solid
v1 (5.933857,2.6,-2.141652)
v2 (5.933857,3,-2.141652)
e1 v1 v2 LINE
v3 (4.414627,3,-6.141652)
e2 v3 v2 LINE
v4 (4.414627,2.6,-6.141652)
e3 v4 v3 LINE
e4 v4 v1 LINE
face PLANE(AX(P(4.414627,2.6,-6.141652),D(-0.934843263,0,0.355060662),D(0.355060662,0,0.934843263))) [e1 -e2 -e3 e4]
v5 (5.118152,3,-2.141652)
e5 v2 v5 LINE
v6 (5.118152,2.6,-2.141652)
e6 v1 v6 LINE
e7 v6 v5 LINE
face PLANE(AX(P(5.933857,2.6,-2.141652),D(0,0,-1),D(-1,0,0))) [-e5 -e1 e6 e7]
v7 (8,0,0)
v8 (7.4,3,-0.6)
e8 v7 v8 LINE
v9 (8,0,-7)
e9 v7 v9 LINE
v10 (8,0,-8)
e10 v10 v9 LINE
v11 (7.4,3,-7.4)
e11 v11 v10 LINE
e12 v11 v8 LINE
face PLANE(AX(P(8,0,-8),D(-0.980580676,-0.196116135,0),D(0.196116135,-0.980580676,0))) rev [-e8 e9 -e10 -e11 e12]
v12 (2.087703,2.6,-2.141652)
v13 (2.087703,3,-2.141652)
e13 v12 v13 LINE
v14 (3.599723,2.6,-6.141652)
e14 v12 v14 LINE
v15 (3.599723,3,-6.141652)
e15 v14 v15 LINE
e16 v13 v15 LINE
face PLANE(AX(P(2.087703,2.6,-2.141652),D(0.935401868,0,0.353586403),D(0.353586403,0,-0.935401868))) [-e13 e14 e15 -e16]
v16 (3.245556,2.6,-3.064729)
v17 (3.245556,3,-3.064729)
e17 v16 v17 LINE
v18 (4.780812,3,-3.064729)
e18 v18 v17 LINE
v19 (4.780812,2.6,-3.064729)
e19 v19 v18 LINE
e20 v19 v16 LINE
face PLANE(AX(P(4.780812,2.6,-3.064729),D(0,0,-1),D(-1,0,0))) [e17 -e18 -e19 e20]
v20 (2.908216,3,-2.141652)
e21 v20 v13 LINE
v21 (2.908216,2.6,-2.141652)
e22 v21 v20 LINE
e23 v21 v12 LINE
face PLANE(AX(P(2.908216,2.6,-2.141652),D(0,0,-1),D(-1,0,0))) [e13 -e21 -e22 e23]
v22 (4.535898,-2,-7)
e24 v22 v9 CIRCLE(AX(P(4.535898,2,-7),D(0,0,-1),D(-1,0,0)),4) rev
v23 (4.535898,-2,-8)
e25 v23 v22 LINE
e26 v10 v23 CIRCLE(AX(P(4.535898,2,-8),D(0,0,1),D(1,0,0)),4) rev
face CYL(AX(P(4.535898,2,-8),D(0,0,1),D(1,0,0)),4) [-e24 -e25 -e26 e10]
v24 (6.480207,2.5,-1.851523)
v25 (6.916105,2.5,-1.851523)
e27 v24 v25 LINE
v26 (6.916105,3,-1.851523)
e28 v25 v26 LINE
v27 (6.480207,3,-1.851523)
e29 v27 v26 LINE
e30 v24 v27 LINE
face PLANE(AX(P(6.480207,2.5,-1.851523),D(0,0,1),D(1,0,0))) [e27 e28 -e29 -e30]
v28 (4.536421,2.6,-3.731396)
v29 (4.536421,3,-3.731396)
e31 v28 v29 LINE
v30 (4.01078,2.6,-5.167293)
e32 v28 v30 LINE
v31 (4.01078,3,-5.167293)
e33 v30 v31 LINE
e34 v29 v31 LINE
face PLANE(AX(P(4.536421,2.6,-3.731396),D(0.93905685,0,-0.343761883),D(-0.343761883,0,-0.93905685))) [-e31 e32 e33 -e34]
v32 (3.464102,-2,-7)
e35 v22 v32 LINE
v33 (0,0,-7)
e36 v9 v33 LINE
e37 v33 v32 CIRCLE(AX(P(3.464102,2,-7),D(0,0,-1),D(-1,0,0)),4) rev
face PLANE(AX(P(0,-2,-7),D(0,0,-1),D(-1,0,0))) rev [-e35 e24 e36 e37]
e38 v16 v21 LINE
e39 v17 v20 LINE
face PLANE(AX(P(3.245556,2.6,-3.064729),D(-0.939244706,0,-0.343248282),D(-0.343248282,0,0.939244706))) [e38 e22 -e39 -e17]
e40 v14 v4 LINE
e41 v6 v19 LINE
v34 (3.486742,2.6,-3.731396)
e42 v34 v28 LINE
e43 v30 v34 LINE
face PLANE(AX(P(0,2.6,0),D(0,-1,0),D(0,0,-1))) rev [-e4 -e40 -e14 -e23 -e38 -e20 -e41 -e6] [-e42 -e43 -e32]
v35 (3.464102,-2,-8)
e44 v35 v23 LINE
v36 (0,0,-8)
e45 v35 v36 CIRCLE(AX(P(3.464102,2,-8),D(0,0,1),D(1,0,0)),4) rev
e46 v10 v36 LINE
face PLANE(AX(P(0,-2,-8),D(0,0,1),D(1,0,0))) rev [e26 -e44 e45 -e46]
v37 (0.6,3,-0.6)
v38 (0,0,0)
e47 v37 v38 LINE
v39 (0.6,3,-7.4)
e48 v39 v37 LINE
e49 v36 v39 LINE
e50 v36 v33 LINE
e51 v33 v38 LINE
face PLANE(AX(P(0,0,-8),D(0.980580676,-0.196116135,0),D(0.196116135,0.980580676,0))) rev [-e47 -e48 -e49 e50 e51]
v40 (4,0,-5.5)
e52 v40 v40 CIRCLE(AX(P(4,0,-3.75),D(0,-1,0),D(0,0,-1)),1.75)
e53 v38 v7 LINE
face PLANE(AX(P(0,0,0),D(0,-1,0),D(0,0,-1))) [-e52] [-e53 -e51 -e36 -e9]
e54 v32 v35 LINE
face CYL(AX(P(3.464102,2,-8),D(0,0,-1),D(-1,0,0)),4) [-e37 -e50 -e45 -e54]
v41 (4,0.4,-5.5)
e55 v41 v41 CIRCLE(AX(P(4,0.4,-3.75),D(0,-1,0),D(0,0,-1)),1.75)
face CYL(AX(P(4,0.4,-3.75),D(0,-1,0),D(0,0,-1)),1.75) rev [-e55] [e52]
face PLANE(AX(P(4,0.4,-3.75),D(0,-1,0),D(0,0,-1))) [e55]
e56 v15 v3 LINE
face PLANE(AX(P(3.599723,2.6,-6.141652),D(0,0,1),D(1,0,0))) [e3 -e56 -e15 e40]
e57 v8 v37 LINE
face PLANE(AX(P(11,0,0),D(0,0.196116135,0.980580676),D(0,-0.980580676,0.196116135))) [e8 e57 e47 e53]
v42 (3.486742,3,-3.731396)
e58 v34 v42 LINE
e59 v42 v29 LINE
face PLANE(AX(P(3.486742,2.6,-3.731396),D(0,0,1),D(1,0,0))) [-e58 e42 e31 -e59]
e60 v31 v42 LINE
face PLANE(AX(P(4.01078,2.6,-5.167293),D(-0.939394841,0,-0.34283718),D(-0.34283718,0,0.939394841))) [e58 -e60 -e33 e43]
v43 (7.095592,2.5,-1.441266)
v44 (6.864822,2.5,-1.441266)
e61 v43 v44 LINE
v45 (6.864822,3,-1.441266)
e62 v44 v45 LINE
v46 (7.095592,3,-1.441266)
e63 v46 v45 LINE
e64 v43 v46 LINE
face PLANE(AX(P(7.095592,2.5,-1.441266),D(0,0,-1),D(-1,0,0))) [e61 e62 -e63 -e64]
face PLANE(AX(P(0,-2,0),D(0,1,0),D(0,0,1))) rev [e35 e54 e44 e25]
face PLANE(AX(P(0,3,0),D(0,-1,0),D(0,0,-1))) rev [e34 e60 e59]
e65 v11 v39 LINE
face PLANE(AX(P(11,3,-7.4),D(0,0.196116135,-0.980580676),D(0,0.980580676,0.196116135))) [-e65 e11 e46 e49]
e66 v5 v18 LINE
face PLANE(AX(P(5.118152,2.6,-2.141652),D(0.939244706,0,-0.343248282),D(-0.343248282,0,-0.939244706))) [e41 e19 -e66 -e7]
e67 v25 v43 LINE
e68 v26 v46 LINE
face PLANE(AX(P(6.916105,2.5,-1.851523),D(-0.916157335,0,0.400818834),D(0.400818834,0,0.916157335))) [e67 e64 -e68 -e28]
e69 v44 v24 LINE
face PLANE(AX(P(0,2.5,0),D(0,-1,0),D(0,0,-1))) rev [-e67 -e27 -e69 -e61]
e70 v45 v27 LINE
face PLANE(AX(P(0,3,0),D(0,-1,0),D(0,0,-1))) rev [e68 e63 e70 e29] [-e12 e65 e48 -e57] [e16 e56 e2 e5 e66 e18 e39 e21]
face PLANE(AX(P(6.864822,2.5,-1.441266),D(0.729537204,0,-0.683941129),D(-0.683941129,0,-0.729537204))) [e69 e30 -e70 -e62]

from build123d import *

# Parameters (mm, degrees)
SKETCH1_W               = 8
SKETCH1_H               = 8
BOSS_EXTRUDE1_DEPTH     = 3
CUT_EXTRUDE1_DEPTH      = 12.704699911
CUT_EXTRUDE1_DEPTH_BACK = 12.704699911
CUT_EXTRUDE2_DEPTH      = 11
SKETCH4_R               = 1.75
CUT_EXTRUDE3_DEPTH      = 0.4
SKETCH5_W               = 8
SKETCH5_H               = 1
BOSS_EXTRUDE2_DEPTH     = 2
FILLET1_R               = 4
CUT_EXTRUDE4_DEPTH      = 0.4
CUT_EXTRUDE5_DEPTH      = 0.5


with BuildPart() as part:
    # Sketch1 → Boss-Extrude1 (new body)
    with BuildSketch(Plane(origin=(0, 0, 0), x_dir=(1, 0, 0), z_dir=(0, 1, 0))):
        with Locations((4, 4)):
            Rectangle(SKETCH1_W, SKETCH1_H)
    extrude(amount=BOSS_EXTRUDE1_DEPTH)

    # Sketch2 → Cut-Extrude1 (cut, two sides: drawn at the far end of the back side and taken through both)
    with BuildSketch(Plane.XY.offset(-CUT_EXTRUDE1_DEPTH_BACK)):
        Polygon((0, 0), (0.6, 3), (0, 3), align=None)
        Polygon((8, 0), (7.4, 3), (8, 3), align=None)
    extrude(amount=CUT_EXTRUDE1_DEPTH + CUT_EXTRUDE1_DEPTH_BACK, mode=Mode.SUBTRACT)

    # Sketch3 → Cut-Extrude2 (cut)
    with BuildSketch(Plane(origin=(0, 0, 0), x_dir=(0, 0, -1), z_dir=(1, 0, 0))):
        Polygon((0, 0), (0.6, 3), (0, 3), align=None)
        Polygon((8, 3), (7.4, 3), (8, 0), align=None)
    extrude(amount=CUT_EXTRUDE2_DEPTH, mode=Mode.SUBTRACT)

    # Sketch4 → Cut-Extrude3 (cut)
    with BuildSketch(Plane.XZ):
        with Locations(Location((4, -3.75, 0), (0, 0, 270))):
            Circle(SKETCH4_R)
    extrude(amount=-CUT_EXTRUDE3_DEPTH, mode=Mode.SUBTRACT)

    # Sketch5 → Boss-Extrude2 (add)
    with BuildSketch(Plane.XZ):
        with Locations((4, -7.5)):
            Rectangle(SKETCH5_W, SKETCH5_H)
    extrude(amount=BOSS_EXTRUDE2_DEPTH)

    # Fillet1
    # the kernel refuses this fillet: 4 mm, written as the material it takes off along each edge
    with BuildSketch(Plane(origin=(8, -2, -16.660254038), x_dir=(0, 1, 0), z_dir=(0, 0, 1)), Plane(origin=(0, -2, 1.660254038), x_dir=(0, 1, 0), z_dir=(0, 0, -1))) as fillet1_piece_1:
        with BuildLine():
            CenterArc((4, 3.464101615), FILLET1_R, 180, 60)
            Line((0, 3.464101615), (-0.08, 3.464101615))
            Line((-0.08, 3.464101615), (-0.08, 0))
            Line((-0.08, 0), (0, -0.08))
            ThreePointArc((0, -0.08), (1, -0.08), (1.96, -0.069282032))
            Line((1.96, -0.069282032), (2, 0))
        make_face()
    extrude(amount=18.320508076, mode=Mode.SUBTRACT)

    # Sketch6 → Cut-Extrude4 (cut)
    with BuildSketch(Plane(origin=(0, 3, 0), x_dir=(1, 0, 0), z_dir=(0, 1, 0))):
        Polygon((5.933857302, 2.141652068), (5.118152174, 2.141652068), (4.780812431, 3.064728992), (3.24555602, 3.064728992), (2.908216277, 2.141652068), (2.087703456, 2.141652068), (3.599722687, 6.141652068), (4.414626533, 6.141652068), align=None)
        Polygon((4.536421405, 3.731395658), (4.010780379, 5.167293094), (3.486741918, 3.731395658), align=None, mode=Mode.SUBTRACT)
    extrude(amount=-CUT_EXTRUDE4_DEPTH, mode=Mode.SUBTRACT)

    # Sketch7 → Cut-Extrude5 (cut)
    with BuildSketch(Plane(origin=(0, 3, 0), x_dir=(1, 0, 0), z_dir=(0, 1, 0))):
        Polygon((7.095591712, 1.44126633), (6.864822481, 1.44126633), (6.480207097, 1.85152274), (6.916104533, 1.85152274), align=None)
    extrude(amount=-CUT_EXTRUDE5_DEPTH, mode=Mode.SUBTRACT)


solid = part.part
